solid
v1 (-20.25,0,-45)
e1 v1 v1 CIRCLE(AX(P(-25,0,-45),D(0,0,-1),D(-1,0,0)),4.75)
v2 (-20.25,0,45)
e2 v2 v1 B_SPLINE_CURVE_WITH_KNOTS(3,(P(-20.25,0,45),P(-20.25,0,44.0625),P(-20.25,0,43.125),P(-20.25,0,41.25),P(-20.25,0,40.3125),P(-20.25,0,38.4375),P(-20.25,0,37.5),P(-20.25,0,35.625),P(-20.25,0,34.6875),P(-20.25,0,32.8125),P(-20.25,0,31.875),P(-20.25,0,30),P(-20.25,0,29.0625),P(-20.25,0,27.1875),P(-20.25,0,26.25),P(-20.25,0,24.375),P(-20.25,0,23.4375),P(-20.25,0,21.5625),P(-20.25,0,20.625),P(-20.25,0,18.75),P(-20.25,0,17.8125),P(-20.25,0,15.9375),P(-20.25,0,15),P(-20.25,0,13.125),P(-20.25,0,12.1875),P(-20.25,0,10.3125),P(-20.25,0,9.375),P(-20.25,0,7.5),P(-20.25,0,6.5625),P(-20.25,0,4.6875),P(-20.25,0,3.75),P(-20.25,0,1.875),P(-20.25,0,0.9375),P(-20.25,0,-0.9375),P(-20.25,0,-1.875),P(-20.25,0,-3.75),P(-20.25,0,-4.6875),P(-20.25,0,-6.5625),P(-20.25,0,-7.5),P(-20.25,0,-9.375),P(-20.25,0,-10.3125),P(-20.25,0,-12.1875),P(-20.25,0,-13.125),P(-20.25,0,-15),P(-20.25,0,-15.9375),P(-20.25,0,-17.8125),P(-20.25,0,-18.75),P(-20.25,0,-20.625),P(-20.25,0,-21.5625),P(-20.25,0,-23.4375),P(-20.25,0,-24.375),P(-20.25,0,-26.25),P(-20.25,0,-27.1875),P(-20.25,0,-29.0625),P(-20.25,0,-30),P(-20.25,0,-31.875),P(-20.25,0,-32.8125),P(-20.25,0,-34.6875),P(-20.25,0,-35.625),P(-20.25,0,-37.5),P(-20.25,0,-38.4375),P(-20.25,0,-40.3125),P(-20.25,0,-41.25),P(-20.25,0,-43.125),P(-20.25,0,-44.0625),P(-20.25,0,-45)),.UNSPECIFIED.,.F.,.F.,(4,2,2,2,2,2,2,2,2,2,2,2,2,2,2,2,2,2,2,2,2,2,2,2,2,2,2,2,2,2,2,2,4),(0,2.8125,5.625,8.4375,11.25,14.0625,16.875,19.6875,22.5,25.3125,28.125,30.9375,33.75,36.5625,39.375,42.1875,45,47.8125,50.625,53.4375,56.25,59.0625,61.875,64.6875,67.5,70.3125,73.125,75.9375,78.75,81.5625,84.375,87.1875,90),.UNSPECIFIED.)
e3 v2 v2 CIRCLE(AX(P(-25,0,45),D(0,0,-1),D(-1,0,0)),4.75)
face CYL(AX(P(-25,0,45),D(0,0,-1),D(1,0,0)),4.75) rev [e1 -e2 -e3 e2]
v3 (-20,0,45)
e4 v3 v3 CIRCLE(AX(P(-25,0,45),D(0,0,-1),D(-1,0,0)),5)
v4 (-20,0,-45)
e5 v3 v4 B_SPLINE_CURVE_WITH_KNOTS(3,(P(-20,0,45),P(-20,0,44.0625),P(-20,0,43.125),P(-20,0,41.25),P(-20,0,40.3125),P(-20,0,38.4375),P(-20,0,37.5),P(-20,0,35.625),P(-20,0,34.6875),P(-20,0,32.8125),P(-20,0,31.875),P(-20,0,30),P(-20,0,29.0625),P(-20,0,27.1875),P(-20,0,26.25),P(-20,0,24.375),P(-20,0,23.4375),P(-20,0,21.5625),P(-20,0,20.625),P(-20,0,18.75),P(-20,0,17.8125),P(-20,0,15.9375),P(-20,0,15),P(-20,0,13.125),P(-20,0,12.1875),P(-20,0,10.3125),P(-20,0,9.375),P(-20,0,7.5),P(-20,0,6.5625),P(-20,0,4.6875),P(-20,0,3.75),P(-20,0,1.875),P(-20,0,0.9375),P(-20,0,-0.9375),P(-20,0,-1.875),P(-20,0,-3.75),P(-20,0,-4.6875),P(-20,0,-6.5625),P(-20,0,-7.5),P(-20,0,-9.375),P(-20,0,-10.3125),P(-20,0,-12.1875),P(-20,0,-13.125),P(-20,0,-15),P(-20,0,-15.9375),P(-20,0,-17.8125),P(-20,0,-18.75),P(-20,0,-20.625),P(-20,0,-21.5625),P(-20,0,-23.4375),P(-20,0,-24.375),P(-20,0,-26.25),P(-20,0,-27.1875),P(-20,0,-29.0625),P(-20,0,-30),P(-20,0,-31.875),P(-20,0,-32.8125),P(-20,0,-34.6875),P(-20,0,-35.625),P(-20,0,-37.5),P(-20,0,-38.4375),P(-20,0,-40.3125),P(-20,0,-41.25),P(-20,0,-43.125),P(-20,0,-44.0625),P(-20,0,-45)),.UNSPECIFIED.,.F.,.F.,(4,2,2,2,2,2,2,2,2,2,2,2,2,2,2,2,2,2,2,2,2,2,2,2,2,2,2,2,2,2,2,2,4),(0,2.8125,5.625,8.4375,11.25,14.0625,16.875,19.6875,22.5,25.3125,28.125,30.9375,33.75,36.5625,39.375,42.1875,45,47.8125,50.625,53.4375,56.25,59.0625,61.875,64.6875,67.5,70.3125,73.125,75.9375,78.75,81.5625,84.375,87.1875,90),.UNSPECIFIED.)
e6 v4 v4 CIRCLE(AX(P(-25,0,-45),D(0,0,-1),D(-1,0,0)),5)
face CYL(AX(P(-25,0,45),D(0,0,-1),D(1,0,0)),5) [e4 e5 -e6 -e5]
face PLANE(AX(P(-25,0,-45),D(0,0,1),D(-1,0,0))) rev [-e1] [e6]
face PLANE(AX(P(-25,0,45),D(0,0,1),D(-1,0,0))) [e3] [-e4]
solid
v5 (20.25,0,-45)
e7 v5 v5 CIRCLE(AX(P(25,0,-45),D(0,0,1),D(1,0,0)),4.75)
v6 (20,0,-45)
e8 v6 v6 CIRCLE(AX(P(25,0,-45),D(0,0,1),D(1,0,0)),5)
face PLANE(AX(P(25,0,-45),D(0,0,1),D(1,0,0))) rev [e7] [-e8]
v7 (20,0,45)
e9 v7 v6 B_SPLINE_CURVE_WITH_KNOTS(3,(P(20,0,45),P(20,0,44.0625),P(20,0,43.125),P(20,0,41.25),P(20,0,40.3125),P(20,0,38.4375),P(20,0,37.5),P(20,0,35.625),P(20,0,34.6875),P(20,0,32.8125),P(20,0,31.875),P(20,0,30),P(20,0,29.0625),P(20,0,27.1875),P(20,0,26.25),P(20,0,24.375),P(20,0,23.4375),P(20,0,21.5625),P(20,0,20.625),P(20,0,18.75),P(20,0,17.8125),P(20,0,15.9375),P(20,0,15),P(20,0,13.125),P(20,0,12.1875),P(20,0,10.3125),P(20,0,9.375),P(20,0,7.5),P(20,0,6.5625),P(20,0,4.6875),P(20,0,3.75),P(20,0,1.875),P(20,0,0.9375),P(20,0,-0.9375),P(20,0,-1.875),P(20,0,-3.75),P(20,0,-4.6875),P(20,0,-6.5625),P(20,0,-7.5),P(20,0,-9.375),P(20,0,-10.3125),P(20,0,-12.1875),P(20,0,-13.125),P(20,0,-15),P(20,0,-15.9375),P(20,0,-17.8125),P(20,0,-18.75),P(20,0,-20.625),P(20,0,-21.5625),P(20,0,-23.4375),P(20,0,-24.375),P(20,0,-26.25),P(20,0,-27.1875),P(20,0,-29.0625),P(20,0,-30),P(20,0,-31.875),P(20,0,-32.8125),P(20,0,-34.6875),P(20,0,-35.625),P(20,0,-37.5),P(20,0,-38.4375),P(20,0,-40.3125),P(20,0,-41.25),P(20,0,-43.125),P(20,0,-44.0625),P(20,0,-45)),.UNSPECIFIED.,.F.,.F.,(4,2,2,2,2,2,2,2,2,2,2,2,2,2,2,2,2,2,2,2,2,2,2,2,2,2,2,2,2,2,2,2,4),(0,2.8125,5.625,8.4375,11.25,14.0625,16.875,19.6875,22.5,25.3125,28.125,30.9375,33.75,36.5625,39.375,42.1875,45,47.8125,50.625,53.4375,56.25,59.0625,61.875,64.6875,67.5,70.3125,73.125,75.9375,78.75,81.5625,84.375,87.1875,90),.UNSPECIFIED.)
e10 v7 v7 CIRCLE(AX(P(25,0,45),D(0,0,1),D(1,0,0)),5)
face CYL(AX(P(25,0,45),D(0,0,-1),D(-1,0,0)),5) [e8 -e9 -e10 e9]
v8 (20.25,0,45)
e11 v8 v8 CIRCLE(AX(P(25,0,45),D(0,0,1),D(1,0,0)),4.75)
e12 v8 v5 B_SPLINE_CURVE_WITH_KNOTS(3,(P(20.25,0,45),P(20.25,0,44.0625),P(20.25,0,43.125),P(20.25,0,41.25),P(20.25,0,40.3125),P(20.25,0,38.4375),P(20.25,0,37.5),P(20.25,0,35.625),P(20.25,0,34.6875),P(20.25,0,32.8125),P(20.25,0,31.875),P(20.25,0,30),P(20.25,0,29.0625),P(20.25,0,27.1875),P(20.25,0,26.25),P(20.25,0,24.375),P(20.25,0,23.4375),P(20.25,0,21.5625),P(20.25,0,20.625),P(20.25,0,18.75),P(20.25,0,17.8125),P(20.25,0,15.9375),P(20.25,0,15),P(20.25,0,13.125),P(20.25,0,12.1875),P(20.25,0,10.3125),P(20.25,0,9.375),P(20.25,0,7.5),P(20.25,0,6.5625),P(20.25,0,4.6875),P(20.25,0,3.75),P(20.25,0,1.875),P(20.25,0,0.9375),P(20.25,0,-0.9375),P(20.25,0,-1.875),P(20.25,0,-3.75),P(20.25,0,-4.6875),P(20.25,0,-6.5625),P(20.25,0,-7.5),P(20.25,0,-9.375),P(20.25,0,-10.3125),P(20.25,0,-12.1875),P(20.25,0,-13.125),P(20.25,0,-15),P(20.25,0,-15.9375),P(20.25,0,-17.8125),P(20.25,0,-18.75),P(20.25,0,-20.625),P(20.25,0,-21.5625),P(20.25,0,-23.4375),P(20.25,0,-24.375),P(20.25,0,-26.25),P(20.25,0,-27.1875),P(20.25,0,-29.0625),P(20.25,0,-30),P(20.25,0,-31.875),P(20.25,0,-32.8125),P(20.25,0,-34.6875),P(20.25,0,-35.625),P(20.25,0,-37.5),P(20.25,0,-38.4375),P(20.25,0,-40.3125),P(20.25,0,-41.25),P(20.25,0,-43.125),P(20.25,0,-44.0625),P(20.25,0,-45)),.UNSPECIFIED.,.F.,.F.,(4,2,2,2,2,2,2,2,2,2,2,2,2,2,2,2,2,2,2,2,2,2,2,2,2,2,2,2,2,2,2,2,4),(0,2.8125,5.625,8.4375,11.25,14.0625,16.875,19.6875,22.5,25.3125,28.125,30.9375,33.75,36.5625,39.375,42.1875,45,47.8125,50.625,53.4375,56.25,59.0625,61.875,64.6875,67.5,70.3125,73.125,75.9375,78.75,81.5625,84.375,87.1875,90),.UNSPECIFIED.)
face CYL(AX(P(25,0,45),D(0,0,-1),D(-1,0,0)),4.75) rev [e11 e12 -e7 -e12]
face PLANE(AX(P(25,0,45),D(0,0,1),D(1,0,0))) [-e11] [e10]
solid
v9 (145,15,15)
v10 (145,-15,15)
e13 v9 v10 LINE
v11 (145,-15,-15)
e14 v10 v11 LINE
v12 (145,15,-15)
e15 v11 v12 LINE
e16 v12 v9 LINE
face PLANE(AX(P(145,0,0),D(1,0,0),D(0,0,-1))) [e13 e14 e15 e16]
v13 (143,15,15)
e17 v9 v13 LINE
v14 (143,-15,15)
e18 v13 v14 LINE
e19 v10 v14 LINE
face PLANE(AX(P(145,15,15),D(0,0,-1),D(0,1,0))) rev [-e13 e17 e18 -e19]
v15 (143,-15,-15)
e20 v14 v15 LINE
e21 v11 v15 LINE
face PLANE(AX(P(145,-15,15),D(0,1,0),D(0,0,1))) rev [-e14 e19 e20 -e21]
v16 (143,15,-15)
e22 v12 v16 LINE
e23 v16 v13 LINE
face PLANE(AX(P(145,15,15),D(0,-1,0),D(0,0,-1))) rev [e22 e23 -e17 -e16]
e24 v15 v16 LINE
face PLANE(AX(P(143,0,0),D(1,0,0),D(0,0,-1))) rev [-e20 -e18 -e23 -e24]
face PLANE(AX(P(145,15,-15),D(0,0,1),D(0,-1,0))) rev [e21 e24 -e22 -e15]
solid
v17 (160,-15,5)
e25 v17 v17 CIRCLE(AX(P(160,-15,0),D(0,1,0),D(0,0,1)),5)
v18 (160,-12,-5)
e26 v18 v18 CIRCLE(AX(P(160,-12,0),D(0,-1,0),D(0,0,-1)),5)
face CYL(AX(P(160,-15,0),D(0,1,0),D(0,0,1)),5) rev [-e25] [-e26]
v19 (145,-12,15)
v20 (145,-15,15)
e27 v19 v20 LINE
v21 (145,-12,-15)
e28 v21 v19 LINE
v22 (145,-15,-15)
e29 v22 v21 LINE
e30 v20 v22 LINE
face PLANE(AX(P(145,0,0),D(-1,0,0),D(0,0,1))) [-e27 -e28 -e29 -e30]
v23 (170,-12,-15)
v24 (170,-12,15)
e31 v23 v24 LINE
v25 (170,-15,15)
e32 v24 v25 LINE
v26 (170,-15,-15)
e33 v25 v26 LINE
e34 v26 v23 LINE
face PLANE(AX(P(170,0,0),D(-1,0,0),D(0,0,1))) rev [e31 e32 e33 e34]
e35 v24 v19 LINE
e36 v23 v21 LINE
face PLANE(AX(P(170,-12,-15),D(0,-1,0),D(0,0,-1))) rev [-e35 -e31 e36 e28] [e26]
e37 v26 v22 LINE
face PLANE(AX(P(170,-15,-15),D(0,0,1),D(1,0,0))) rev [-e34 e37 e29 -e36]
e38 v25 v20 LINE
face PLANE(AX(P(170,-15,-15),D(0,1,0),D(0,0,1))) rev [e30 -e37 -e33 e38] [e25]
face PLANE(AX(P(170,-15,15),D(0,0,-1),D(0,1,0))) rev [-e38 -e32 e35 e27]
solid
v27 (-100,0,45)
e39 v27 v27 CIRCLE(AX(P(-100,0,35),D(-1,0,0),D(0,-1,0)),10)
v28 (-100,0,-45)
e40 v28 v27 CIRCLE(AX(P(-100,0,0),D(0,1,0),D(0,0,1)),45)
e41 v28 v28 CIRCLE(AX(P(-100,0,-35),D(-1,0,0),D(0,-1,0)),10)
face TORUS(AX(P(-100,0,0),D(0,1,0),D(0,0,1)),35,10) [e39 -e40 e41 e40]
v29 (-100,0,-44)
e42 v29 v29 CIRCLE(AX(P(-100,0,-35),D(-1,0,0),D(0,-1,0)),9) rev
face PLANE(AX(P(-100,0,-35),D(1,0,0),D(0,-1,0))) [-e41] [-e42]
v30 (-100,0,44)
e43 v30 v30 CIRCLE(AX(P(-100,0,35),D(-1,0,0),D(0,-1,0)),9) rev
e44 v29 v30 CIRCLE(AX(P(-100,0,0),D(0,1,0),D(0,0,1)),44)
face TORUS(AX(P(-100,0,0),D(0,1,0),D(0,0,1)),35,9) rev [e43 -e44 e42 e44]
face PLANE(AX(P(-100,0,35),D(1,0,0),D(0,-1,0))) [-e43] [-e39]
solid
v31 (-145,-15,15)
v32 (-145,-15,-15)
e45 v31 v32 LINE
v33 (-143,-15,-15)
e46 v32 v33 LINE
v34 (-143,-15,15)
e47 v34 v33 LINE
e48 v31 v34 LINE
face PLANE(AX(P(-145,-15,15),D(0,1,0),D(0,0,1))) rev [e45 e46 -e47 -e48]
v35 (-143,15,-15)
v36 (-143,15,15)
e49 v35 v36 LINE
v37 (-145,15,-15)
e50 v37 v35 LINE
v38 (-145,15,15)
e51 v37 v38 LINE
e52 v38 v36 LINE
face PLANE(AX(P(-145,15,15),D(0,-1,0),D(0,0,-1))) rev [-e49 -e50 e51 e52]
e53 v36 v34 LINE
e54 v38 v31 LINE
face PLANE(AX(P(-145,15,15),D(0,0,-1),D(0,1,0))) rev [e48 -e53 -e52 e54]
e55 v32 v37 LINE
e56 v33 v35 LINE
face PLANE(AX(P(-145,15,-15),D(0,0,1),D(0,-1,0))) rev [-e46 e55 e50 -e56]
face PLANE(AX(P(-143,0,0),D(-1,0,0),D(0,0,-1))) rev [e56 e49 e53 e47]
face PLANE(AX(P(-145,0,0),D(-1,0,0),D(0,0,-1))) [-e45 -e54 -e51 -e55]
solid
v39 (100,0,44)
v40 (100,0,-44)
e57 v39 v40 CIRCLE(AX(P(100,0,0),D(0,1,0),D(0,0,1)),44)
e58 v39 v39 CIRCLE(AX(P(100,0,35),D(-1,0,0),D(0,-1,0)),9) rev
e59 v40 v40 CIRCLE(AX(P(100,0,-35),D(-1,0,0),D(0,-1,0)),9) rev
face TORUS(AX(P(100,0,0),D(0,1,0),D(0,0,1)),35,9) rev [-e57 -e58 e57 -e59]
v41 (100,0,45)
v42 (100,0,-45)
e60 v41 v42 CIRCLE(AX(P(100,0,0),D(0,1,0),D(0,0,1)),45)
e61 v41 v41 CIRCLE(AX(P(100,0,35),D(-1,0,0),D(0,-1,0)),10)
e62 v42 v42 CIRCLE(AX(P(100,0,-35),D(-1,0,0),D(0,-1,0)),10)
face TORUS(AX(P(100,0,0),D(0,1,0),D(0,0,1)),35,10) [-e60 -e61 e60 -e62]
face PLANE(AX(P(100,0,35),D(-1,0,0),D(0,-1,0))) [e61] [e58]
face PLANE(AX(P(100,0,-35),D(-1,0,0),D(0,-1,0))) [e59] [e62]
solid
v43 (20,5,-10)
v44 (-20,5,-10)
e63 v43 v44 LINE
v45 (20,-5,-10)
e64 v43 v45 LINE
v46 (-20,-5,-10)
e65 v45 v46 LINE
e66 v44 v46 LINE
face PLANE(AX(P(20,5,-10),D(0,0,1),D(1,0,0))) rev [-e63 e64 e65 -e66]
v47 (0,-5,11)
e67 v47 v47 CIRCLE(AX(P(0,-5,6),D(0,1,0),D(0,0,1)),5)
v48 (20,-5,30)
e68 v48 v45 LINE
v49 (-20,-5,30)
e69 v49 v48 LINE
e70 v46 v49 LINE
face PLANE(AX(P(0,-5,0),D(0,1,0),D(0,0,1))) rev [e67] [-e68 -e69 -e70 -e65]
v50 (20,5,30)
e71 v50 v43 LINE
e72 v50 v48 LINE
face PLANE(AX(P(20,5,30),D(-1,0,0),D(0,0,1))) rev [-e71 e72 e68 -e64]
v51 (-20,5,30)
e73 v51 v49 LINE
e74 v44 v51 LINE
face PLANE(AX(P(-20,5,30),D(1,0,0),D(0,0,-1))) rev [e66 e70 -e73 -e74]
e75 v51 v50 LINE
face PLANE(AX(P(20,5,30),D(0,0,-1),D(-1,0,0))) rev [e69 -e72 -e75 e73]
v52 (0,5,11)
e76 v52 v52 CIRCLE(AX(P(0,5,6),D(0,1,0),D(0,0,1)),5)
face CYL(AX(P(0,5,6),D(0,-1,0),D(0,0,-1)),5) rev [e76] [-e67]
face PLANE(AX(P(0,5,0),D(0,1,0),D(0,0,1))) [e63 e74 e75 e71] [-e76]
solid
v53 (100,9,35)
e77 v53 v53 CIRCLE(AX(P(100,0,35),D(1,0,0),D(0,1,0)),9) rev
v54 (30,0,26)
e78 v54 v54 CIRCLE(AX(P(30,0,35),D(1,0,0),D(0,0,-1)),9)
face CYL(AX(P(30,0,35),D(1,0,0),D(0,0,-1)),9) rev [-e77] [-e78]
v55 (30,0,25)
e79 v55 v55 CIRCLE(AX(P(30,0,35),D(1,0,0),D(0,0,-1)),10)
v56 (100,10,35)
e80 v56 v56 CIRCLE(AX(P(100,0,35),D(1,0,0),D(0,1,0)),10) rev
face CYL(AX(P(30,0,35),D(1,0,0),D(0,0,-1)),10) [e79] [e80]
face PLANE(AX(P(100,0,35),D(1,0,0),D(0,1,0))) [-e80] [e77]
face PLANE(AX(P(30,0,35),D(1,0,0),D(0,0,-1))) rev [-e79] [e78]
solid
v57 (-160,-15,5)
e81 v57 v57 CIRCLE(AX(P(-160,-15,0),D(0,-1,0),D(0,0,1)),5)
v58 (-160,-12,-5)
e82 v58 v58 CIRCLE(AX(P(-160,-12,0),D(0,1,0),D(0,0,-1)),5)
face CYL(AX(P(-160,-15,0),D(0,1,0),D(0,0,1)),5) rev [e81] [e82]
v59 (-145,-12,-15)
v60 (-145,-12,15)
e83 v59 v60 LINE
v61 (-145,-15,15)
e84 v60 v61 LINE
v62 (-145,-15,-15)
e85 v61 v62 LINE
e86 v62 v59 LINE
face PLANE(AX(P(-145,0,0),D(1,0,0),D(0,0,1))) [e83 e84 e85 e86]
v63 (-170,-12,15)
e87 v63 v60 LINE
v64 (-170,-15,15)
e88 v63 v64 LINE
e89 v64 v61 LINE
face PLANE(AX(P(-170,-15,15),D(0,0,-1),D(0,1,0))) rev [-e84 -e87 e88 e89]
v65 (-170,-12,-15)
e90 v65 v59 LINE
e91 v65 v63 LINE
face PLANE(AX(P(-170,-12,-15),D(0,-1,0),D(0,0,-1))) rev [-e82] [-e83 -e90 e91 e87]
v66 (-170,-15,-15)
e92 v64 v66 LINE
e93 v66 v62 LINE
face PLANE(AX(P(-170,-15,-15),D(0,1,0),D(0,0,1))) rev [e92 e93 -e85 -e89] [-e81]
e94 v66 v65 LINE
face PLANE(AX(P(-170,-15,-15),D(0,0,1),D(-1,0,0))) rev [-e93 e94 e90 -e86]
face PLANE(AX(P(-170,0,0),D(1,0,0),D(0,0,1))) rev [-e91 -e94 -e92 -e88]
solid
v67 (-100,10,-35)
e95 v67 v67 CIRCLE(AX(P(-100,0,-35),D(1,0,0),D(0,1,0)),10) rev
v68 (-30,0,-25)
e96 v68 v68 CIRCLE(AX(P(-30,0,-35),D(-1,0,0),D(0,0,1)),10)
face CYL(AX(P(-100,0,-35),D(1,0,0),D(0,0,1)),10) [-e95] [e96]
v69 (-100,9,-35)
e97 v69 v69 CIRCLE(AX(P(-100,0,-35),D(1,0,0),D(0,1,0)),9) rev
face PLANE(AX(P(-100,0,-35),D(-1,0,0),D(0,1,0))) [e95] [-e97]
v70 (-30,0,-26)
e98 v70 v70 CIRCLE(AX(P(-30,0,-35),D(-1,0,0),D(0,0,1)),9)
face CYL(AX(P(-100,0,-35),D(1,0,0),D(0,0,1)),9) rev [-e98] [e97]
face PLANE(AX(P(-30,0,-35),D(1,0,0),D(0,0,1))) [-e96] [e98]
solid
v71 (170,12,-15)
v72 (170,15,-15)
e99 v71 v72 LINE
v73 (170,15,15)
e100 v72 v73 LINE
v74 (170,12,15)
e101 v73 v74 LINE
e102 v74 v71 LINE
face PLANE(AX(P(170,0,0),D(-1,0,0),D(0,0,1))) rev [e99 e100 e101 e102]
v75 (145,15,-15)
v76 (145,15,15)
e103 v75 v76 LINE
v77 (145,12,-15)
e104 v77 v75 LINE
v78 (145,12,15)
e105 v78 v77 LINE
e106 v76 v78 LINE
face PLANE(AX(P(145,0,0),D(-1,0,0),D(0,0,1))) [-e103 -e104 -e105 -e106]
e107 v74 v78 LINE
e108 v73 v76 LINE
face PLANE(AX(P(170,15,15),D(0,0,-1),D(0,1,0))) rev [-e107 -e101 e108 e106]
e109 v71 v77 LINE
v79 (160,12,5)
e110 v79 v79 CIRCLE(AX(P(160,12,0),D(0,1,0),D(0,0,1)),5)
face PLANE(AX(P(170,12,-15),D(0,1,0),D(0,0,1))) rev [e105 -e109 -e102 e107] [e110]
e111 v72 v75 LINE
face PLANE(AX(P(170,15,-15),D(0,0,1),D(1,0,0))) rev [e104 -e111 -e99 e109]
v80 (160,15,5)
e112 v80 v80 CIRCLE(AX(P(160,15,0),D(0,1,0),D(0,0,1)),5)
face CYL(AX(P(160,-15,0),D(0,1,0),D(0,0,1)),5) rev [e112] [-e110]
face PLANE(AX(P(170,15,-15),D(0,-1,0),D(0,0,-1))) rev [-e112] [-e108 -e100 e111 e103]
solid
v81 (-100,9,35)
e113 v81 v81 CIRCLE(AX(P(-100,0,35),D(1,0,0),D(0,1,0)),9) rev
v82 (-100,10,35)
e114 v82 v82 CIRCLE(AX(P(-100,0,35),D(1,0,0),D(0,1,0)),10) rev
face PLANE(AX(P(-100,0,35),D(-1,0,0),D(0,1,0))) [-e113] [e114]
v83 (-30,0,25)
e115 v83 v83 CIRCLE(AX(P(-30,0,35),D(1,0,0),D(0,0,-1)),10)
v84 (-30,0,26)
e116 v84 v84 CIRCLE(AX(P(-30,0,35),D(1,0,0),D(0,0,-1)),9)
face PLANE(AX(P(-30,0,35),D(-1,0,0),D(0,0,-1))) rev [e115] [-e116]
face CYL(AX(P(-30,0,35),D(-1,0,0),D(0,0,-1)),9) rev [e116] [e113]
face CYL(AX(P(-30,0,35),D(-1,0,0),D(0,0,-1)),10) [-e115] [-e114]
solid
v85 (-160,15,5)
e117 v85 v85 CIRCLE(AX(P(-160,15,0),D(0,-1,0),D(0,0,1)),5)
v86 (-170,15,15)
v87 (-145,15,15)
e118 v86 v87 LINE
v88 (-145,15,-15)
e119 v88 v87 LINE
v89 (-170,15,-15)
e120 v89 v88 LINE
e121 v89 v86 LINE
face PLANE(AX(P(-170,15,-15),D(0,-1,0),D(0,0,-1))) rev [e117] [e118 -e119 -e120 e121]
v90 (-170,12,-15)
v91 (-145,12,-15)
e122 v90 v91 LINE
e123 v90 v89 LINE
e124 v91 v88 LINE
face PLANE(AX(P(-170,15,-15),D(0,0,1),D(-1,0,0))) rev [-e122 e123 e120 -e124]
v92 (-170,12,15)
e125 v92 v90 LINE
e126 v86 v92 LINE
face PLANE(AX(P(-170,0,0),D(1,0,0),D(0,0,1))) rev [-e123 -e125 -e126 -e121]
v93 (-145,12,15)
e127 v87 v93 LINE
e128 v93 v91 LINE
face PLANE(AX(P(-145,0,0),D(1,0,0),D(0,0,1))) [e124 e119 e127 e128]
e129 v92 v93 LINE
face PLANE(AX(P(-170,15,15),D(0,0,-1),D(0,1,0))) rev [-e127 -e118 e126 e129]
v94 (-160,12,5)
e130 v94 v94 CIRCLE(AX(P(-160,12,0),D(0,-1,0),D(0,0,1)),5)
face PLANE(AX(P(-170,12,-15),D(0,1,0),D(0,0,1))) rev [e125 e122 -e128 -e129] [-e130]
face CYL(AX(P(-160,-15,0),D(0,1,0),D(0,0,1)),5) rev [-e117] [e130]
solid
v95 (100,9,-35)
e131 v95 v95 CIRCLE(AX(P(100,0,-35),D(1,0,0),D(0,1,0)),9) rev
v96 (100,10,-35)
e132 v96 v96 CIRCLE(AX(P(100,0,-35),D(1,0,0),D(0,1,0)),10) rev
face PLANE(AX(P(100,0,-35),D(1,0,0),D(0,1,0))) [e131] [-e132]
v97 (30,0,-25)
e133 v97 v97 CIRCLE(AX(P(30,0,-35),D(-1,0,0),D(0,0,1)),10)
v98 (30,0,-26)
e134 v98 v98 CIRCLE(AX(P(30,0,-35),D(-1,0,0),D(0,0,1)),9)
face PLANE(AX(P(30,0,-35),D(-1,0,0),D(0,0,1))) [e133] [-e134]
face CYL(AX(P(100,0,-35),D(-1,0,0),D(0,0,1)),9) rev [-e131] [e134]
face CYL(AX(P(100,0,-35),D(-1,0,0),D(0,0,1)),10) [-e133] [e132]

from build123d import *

# Parameters (mm, degrees)
SKETCH19_R                       = 5
SKETCH19_R_2                     = 4.75
STRUCTURAL_MEMBER2_DEPTH         = 90
STRUCTURAL_START                 = 30
STRUCTURAL_MEMBER1_OUTLINE_R     = 10
STRUCTURAL_MEMBER1_OUTLINE_R_2   = 9
STRUCTURAL_MEMBER1_DEPTH         = 70
STRUCTURAL_MEMBER1_2_OUTLINE_R   = 10
STRUCTURAL_MEMBER1_2_OUTLINE_R_2 = 9
STRUCTURAL_MEMBER1_2_ANGLE       = 180
STRUCTURAL_MEMBER1_3_OUTLINE_R   = 10
STRUCTURAL_MEMBER1_3_OUTLINE_R_2 = 9
STRUCTURAL_MEMBER1_3_DEPTH       = 70
SKETCH13_W                       = 30
SKETCH13_H                       = 30
BOSS_EXTRUDE2_DEPTH              = 2
SKETCH15_W                       = 30
SKETCH15_H                       = 3
BOSS_EXTRUDE3_DEPTH              = 25
BOSS_EXTRUDE3_2_DEPTH            = 25
SKETCH16_R                       = 5
CUT_EXTRUDE2_DEPTH               = 179.395627749
SKETCH20_W                       = 40
SKETCH20_H                       = 40
SKETCH20_R                       = 5
BOSS_EXTRUDE4_DEPTH              = 5


# Read off the part's stored shape, not the designer's step: Structural Member1
with BuildPart() as part:
    # Sketch19 → Structural Member2 (new body)
    with BuildSketch(Plane(origin=(25, 0, -45), x_dir=(1, 0, 0), z_dir=(0, 0, 1))):
        Circle(SKETCH19_R)
        Circle(SKETCH19_R_2, mode=Mode.SUBTRACT)
    extrude(amount=STRUCTURAL_MEMBER2_DEPTH)


with BuildPart() as body_2:
    # Structural Member1 outline → Structural Member1 (new body)
    with BuildSketch(Plane.YZ.offset(STRUCTURAL_START)):
        with Locations((0, -35)):
            Circle(STRUCTURAL_MEMBER1_OUTLINE_R)
        with Locations((0, -35)):
            Circle(STRUCTURAL_MEMBER1_OUTLINE_R_2, mode=Mode.SUBTRACT)
    extrude(amount=STRUCTURAL_MEMBER1_DEPTH)


with BuildPart() as body_3:
    # Structural Member1 2 outline → Structural Member1 2 (revolve)
    with BuildSketch(Plane.ZY.offset(-100)):
        with Locations((35, 0)):
            Circle(STRUCTURAL_MEMBER1_2_OUTLINE_R)
        with Locations((35, 0)):
            Circle(STRUCTURAL_MEMBER1_2_OUTLINE_R_2, mode=Mode.SUBTRACT)
    revolve(axis=Axis((100, 0, 0), (0, 1, 0)), revolution_arc=STRUCTURAL_MEMBER1_2_ANGLE)


with BuildPart() as body_4:
    # Structural Member1 3 outline → Structural Member1 3 (new body)
    with BuildSketch(Plane.YZ.offset(STRUCTURAL_START)):
        with Locations((0, 35)):
            Circle(STRUCTURAL_MEMBER1_3_OUTLINE_R)
        with Locations((0, 35)):
            Circle(STRUCTURAL_MEMBER1_3_OUTLINE_R_2, mode=Mode.SUBTRACT)
    extrude(amount=STRUCTURAL_MEMBER1_3_DEPTH)


with BuildPart() as body_5:
    # Mirror1: mirrored copy
    add(part.part.mirror(Plane(origin=(0, 0, 0), x_dir=(0, 0, 1), z_dir=(1, 0, 0))))


with BuildPart() as body_6:
    # Mirror1 2: mirrored copy
    add(body_2.part.mirror(Plane(origin=(0, 0, 0), x_dir=(0, 0, 1), z_dir=(1, 0, 0))))


with BuildPart() as body_7:
    # Mirror1 3: mirrored copy
    add(body_3.part.mirror(Plane(origin=(0, 0, 0), x_dir=(0, 0, 1), z_dir=(1, 0, 0))))


with BuildPart() as body_8:
    # Mirror1 4: mirrored copy
    add(body_4.part.mirror(Plane(origin=(0, 0, 0), x_dir=(0, 0, 1), z_dir=(1, 0, 0))))


with BuildPart() as body_9:
    # Sketch13 → Boss-Extrude2 (new body)
    with BuildSketch(Plane(origin=(143, 0, 0), x_dir=(0, 0, -1), z_dir=(1, 0, 0))):
        Rectangle(SKETCH13_W, SKETCH13_H)
    extrude(amount=BOSS_EXTRUDE2_DEPTH)


with BuildPart() as body_10:
    # Sketch15 → Boss-Extrude3 (new body)
    with BuildSketch(Plane(origin=(145, 0, 0), x_dir=(0, 0, -1), z_dir=(1, 0, 0))):
        with Locations((0, 13.5)):
            Rectangle(SKETCH15_W, SKETCH15_H)
    extrude(amount=BOSS_EXTRUDE3_DEPTH)


with BuildPart() as body_11:
    # Sketch15 → Boss-Extrude3 2 (new body)
    with BuildSketch(Plane(origin=(145, 0, 0), x_dir=(0, 0, -1), z_dir=(1, 0, 0))):
        with Locations((0, -13.5)):
            Rectangle(SKETCH15_W, SKETCH15_H)
    extrude(amount=BOSS_EXTRUDE3_2_DEPTH)


with BuildPart() as cut_extrude2_tool:
    # Sketch16 → Cut-Extrude2 (new, through all)
    with BuildSketch(Plane(origin=(0, 15, 0), x_dir=(1, 0, 0), z_dir=(0, 1, 0))):
        with Locations(Location((160, 0, 0), (0, 0, 270))):
            Circle(SKETCH16_R)
    extrude(amount=-CUT_EXTRUDE2_DEPTH)


with BuildPart() as body_10_1:
    add(body_10.part)

    # Cut-Extrude2: cut by cut_extrude2_tool
    add(cut_extrude2_tool.part, mode=Mode.SUBTRACT)


with BuildPart() as body_11_1:
    add(body_11.part)

    # Cut-Extrude2: cut by cut_extrude2_tool
    add(cut_extrude2_tool.part, mode=Mode.SUBTRACT)


with BuildPart() as body_12:
    # Mirror2: mirrored copy
    add(body_10_1.part.mirror(Plane(origin=(0, 0, 0), x_dir=(0, 0, 1), z_dir=(1, 0, 0))))


with BuildPart() as body_13:
    # Mirror2 2: mirrored copy
    add(body_9.part.mirror(Plane(origin=(0, 0, 0), x_dir=(0, 0, 1), z_dir=(1, 0, 0))))


with BuildPart() as body_14:
    # Mirror2 3: mirrored copy
    add(body_11_1.part.mirror(Plane(origin=(0, 0, 0), x_dir=(0, 0, 1), z_dir=(1, 0, 0))))


with BuildPart() as body_15:
    # Sketch20 → Boss-Extrude4 (new, symmetric)
    with BuildSketch(Plane(origin=(0, 0, 0), x_dir=(1, 0, 0), z_dir=(0, 1, 0))):
        with Locations((0, -10)):
            Rectangle(SKETCH20_W, SKETCH20_H)
        with Locations(Location((0, -6, 0), (0, 0, 270))):
            Circle(SKETCH20_R, mode=Mode.SUBTRACT)
    extrude(amount=BOSS_EXTRUDE4_DEPTH, both=True)


solid = Compound([part.part, body_2.part, body_3.part, body_4.part, body_5.part, body_6.part, body_7.part, body_8.part, body_9.part, body_10_1.part, body_11_1.part, body_12.part, body_13.part, body_14.part, body_15.part])
